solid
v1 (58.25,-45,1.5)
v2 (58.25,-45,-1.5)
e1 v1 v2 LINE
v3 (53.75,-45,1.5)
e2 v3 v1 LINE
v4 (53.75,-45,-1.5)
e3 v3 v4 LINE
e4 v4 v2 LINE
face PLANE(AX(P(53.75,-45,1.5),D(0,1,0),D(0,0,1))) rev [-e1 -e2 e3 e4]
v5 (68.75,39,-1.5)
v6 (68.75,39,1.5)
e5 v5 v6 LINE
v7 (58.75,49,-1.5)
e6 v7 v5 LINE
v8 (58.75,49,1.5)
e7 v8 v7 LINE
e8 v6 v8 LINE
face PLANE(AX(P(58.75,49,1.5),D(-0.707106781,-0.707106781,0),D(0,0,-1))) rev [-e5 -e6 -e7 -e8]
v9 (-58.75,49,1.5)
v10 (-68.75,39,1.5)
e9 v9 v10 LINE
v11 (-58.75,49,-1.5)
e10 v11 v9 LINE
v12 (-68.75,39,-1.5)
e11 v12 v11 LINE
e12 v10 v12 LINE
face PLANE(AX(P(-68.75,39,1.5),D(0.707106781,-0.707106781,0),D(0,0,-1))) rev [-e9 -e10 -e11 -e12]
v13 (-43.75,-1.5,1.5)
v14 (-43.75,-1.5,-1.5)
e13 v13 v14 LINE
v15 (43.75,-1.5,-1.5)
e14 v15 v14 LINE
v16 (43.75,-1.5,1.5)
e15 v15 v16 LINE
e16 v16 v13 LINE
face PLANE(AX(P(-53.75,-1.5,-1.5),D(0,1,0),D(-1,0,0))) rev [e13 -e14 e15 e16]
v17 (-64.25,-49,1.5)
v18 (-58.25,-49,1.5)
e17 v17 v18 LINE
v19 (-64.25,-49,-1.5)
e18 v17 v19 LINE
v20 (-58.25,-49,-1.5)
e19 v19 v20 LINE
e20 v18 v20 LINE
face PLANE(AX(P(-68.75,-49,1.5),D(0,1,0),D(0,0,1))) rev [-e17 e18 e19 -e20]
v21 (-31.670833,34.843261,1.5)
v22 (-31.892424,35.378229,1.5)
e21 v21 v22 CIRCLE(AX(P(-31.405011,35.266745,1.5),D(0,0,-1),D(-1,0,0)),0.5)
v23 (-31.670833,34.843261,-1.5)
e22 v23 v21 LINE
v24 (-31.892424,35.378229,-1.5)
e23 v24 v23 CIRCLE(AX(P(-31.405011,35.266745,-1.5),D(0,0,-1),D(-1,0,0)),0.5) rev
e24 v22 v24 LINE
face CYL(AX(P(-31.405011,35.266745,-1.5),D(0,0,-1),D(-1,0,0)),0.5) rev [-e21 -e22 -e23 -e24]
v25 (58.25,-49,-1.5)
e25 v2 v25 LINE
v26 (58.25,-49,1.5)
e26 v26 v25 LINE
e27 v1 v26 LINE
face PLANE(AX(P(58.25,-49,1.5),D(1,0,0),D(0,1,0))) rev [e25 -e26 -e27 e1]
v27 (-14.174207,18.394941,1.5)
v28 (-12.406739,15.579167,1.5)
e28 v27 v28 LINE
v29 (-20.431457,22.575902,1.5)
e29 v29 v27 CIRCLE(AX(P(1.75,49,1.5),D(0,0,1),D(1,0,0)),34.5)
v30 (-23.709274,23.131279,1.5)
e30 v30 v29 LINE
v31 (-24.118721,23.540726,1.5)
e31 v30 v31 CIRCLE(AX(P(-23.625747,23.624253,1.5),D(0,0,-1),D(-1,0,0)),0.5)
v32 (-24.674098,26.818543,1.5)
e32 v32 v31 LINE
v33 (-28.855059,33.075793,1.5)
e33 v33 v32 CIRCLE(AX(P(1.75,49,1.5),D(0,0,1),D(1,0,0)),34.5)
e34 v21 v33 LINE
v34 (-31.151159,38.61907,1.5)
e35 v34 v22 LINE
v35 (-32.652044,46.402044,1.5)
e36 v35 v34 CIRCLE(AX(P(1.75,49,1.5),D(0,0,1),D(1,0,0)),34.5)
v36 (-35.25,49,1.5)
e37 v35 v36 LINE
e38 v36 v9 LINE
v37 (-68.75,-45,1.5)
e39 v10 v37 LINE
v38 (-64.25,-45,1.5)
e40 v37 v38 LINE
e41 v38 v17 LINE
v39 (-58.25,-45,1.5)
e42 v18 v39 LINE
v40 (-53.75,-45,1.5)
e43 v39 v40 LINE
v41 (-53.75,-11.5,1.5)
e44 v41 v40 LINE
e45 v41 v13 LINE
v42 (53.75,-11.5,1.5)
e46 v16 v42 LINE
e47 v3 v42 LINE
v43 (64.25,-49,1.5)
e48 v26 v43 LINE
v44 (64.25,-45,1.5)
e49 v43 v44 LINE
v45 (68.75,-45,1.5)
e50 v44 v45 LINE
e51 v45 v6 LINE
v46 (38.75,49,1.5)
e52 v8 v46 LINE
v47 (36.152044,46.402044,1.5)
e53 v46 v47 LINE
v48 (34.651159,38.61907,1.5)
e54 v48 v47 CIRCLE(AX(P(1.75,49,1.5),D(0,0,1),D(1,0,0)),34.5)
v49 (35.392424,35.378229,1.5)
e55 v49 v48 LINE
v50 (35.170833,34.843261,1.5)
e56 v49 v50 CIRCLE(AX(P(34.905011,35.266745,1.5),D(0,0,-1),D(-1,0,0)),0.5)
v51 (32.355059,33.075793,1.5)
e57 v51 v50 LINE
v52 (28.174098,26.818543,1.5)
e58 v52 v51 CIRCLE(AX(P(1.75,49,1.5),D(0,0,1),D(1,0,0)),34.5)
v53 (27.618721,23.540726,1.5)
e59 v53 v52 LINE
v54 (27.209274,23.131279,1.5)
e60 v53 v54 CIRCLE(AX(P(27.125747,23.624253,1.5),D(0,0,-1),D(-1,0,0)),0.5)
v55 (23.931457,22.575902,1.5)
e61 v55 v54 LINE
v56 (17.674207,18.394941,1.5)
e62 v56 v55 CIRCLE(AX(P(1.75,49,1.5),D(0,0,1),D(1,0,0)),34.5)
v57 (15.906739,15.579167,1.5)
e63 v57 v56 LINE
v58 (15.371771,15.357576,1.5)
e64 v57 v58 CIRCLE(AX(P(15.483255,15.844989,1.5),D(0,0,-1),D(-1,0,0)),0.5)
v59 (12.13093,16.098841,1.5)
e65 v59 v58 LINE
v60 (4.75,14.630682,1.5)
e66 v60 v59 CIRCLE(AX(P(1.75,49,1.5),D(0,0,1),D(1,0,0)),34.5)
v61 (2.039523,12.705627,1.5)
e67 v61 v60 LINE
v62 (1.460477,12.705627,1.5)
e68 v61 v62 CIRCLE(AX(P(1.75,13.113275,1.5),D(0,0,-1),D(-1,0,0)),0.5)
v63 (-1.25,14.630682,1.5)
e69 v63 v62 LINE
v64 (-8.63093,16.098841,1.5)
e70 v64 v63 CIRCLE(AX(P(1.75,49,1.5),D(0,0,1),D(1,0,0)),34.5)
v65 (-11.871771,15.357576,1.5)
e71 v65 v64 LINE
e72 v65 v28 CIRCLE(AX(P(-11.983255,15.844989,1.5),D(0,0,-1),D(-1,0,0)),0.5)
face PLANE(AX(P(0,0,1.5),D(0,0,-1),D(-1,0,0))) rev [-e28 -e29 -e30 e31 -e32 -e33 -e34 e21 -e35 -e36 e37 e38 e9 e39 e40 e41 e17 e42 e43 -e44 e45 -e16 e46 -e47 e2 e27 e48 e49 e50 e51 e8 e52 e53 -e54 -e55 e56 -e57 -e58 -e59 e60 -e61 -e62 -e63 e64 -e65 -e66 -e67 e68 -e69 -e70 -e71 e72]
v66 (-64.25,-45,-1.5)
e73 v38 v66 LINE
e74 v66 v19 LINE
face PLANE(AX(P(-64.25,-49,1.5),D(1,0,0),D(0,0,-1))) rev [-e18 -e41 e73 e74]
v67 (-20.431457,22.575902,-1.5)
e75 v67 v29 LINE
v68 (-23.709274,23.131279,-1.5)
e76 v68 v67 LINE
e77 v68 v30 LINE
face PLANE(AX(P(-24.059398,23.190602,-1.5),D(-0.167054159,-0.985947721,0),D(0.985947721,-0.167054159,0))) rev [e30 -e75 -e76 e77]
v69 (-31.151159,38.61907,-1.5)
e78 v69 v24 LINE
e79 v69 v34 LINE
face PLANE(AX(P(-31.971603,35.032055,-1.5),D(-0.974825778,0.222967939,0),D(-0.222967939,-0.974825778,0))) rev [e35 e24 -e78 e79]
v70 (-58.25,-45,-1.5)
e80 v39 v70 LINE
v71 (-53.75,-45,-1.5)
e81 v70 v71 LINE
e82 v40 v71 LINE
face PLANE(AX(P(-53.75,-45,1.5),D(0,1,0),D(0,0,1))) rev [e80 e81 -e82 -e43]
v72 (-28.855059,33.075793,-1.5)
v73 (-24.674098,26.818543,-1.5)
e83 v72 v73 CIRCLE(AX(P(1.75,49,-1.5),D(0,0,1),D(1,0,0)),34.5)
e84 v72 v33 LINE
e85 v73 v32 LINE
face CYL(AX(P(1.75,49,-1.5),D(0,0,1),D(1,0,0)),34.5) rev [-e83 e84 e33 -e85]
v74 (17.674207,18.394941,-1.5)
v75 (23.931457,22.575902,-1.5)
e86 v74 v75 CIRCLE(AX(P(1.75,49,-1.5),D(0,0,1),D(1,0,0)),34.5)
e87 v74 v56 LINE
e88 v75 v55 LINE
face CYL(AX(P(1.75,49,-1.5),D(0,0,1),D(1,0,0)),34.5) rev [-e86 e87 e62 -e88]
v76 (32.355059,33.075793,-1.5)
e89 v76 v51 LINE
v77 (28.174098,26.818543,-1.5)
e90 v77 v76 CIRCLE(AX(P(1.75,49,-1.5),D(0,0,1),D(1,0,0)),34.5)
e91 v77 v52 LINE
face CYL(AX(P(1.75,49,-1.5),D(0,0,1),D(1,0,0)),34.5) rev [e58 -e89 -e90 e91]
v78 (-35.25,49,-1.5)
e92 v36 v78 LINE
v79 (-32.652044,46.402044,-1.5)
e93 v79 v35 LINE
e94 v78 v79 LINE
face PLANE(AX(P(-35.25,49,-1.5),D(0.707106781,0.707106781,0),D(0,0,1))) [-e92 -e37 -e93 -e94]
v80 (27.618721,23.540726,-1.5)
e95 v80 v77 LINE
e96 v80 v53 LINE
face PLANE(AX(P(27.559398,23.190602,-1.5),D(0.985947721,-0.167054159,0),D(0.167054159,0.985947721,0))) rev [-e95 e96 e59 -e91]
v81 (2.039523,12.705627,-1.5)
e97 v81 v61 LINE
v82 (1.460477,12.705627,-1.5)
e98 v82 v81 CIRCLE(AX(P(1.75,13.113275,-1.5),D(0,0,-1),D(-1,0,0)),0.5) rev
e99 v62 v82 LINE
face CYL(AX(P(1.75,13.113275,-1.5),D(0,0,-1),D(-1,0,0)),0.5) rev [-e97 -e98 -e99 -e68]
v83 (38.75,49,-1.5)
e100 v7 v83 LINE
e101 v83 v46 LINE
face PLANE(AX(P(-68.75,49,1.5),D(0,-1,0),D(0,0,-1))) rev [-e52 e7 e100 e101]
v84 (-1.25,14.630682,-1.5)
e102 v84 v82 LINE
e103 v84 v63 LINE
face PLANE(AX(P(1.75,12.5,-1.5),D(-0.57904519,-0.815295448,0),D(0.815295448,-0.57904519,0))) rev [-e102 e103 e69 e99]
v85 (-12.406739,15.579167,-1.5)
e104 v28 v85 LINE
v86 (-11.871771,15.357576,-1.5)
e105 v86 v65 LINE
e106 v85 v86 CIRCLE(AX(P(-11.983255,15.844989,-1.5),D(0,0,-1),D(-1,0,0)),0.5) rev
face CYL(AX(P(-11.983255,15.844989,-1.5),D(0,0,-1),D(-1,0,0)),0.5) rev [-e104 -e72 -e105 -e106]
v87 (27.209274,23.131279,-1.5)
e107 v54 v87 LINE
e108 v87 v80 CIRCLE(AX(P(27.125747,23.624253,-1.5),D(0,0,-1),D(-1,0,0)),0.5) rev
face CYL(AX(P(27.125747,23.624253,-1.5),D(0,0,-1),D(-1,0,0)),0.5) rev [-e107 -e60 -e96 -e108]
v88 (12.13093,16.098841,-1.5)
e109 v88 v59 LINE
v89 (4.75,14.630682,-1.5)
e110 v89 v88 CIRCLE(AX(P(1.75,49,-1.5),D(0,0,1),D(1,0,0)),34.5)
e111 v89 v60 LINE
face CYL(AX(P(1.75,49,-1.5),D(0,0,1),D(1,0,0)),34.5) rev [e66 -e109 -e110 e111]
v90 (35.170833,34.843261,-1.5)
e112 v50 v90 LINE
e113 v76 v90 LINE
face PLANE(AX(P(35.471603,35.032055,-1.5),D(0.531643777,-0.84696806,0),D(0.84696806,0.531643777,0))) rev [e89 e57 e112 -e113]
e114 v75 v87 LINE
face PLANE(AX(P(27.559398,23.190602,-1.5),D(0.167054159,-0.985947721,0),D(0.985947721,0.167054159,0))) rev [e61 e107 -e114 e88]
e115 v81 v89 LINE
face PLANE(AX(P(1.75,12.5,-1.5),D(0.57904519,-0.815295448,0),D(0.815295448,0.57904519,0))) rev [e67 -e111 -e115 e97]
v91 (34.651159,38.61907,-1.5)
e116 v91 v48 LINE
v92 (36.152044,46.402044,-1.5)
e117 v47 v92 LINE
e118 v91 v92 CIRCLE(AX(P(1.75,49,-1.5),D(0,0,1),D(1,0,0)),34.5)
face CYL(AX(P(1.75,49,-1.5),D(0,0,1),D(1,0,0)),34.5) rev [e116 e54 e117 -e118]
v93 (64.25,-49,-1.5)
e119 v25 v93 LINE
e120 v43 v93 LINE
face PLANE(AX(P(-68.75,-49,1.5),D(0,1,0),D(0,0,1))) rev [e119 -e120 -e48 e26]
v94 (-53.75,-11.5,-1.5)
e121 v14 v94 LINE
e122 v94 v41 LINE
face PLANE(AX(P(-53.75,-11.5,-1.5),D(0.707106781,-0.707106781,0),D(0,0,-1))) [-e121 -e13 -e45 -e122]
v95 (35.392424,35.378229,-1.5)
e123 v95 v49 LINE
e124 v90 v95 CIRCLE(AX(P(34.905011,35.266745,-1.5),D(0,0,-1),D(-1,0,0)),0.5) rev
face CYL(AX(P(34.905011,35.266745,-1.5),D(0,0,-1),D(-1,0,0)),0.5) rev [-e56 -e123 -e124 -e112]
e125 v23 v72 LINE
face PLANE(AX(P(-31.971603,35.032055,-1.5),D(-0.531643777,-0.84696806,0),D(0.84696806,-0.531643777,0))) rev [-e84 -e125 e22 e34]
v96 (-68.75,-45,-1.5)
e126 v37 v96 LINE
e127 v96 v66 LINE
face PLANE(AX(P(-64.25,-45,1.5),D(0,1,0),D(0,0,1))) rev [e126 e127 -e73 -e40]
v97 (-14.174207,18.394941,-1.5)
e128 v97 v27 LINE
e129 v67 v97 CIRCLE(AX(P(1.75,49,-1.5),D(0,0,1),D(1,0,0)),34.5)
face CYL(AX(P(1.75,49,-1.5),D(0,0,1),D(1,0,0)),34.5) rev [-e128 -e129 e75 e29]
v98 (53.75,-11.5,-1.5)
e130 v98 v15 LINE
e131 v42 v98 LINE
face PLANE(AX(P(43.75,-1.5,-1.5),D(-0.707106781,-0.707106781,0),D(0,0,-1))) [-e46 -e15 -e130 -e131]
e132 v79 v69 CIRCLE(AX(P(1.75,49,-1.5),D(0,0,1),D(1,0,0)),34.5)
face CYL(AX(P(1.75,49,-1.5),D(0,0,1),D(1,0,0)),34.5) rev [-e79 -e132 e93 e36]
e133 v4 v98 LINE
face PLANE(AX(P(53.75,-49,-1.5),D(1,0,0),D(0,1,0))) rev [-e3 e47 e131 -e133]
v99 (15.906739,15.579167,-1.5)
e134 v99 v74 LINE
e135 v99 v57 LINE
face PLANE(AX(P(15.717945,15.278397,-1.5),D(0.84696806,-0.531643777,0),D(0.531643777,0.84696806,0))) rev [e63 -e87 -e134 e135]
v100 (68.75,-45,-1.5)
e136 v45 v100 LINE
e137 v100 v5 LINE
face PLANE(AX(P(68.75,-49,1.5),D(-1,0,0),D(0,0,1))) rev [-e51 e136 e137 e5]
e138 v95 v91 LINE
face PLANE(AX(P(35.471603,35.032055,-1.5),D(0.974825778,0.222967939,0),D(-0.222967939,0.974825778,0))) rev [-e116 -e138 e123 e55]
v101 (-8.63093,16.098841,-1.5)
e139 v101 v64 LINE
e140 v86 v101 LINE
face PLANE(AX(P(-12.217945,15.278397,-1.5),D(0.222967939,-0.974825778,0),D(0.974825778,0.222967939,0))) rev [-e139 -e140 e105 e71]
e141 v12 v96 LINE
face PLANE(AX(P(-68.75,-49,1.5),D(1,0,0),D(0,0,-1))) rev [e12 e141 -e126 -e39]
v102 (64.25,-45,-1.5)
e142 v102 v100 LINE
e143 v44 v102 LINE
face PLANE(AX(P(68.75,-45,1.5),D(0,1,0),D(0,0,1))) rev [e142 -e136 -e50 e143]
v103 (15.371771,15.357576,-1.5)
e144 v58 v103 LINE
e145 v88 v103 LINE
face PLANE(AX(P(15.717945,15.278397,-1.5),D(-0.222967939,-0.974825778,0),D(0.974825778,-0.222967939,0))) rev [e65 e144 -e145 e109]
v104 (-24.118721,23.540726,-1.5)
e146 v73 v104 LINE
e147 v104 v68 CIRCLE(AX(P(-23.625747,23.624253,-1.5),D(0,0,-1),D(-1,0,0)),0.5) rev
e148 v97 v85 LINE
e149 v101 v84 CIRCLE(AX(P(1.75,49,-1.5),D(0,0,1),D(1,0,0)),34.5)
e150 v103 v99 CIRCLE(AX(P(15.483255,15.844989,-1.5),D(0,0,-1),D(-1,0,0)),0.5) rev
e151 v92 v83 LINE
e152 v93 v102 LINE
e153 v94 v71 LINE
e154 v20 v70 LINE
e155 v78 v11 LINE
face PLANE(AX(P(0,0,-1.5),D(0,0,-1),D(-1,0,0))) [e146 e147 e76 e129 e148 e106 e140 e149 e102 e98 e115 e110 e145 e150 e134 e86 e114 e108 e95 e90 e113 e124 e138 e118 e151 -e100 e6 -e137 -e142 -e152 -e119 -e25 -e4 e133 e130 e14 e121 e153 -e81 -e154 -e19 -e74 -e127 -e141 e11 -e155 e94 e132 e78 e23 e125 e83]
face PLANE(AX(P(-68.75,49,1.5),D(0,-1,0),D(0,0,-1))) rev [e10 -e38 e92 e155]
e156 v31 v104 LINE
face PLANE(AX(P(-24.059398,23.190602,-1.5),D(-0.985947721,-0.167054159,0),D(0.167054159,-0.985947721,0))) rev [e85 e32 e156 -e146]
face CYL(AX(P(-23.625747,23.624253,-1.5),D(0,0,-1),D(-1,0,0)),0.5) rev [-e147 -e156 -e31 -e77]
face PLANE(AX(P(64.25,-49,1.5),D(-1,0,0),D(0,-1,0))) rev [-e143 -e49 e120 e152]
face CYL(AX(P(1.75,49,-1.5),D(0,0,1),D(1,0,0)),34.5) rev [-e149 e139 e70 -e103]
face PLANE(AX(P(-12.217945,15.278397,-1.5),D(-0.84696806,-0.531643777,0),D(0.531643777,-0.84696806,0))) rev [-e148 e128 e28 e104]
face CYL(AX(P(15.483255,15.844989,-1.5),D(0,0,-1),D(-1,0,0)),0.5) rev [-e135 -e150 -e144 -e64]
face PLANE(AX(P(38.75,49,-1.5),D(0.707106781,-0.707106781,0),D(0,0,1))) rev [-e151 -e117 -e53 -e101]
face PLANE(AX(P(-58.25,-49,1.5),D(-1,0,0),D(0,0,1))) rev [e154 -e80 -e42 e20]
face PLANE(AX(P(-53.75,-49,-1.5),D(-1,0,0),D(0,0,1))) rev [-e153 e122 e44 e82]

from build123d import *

# Parameters (mm, degrees)
SKETCH1_W           = 137.5
SKETCH1_H           = 98
BOSS_EXTRUDE1_DEPTH = 1.5
SKETCH2_R           = 34
SKETCH2_W           = 107.5
SKETCH2_H           = 47.5
CUT_EXTRUDE1_DEPTH  = 85.478177656
CUT_EXTRUDE3_DEPTH  = 85.478177656
FILLET1_R           = 0.5
SKETCH22_W          = 4.5
SKETCH22_H          = 4
CUT_EXTRUDE5_DEPTH  = 85.478177656
CHAMFER1_SIZE       = 10
CHAMFER2_SIZE       = 2.5


with BuildPart() as part:
    # Sketch1 → Boss-Extrude1 (new, symmetric)
    with BuildSketch(Plane.XY):
        Rectangle(SKETCH1_W, SKETCH1_H)
    extrude(amount=BOSS_EXTRUDE1_DEPTH, both=True)

    # Sketch2 → Cut-Extrude1 (cut, through all)
    with BuildSketch(Plane.XY.offset(1.5)):
        with Locations((1.75, 49)):
            Circle(SKETCH2_R)
        with Locations((0, -25.25)):
            Rectangle(SKETCH2_W, SKETCH2_H)
    extrude(amount=-CUT_EXTRUDE1_DEPTH, mode=Mode.SUBTRACT)

    # Sketch17 → Cut-Extrude3 (cut, through all)
    with BuildSketch(Plane.XY.offset(1.5)):
        with BuildLine():
            Line((1.75, 12.5), (-1.25, 14.630682288))
            ThreePointArc((-1.25, 14.630682288), (-4.98061611, 15.162907826), (-8.630929873, 16.098840522))
            Line((-8.630929873, 16.098840522), (-12.217945281, 15.278397063))
            Line((-12.217945281, 15.278397063), (-14.174207068, 18.394941116))
            ThreePointArc((-14.174207068, 18.394941116), (-17.417173039, 20.314298376), (-20.431457275, 22.575902037))
            Line((-20.431457275, 22.575902037), (-24.059397513, 23.190602487))
            Line((-24.059397513, 23.190602487), (-24.674097963, 26.818542725))
            ThreePointArc((-24.674097963, 26.818542725), (-26.935701624, 29.832826961), (-28.855058884, 33.075792932))
            Line((-28.855058884, 33.075792932), (-31.971602937, 35.032054719))
            Line((-31.971602937, 35.032054719), (-31.151159478, 38.619070127))
            ThreePointArc((-31.151159478, 38.619070127), (1.75, 83.5), (34.651159478, 38.619070127))
            Line((34.651159478, 38.619070127), (35.471602937, 35.032054719))
            Line((35.471602937, 35.032054719), (32.355058884, 33.075792932))
            ThreePointArc((32.355058884, 33.075792932), (30.435701624, 29.832826961), (28.174097963, 26.818542725))
            Line((28.174097963, 26.818542725), (27.559397513, 23.190602487))
            Line((27.559397513, 23.190602487), (23.931457275, 22.575902037))
            ThreePointArc((23.931457275, 22.575902037), (20.917173039, 20.314298376), (17.674207068, 18.394941116))
            Line((17.674207068, 18.394941116), (15.717945281, 15.278397063))
            Line((15.717945281, 15.278397063), (12.130929873, 16.098840522))
            ThreePointArc((12.130929873, 16.098840522), (8.48061611, 15.162907826), (4.75, 14.630682288))
            Line((4.75, 14.630682288), (1.75, 12.5))
        make_face()
    extrude(amount=-CUT_EXTRUDE3_DEPTH, mode=Mode.SUBTRACT)

    # Fillet1
    fillet1_edges = [part.edges().sort_by_distance(p)[0] for p in [
        (15.717945281, 15.278397063, 0),
        (1.75, 12.5, 0),
        (-12.217945281, 15.278397063, 0),
        (-24.059397513, 23.190602487, 0),
        (-31.971602937, 35.032054719, 0),
        (35.471602937, 35.032054719, 0),
        (27.559397513, 23.190602487, 0),
    ]]
    fillet(fillet1_edges, radius=FILLET1_R)

    # Sketch22 → Cut-Extrude5 (cut, through all)
    with BuildSketch(Plane(origin=(0, 0, -1.5), x_dir=(-1, 0, 0), z_dir=(0, 0, -1))):
        with Locations((-66.5, -47)):
            Rectangle(SKETCH22_W, SKETCH22_H)
        with Locations((66.5, -47)):
            Rectangle(SKETCH22_W, SKETCH22_H)
        with Locations((56, -47)):
            Rectangle(SKETCH22_W, SKETCH22_H)
        with Locations((-56, -47)):
            Rectangle(SKETCH22_W, SKETCH22_H)
    extrude(amount=-CUT_EXTRUDE5_DEPTH, mode=Mode.SUBTRACT)

    # Chamfer1
    chamfer1_edges = [part.edges().sort_by_distance(p)[0] for p in [
        (-53.75, -1.5, 0),
        (53.75, -1.5, 0),
        (-68.75, 49, 0),
        (68.75, 49, 0),
    ]]
    chamfer(chamfer1_edges, length=CHAMFER1_SIZE)

    # Chamfer2
    # the kernel refuses this chamfer: 2.5 mm, written as the material it takes off along each edge
    with BuildSketch(Plane(origin=(36.25, 49, -8.184978913), x_dir=(1, 0, 0), z_dir=(0, 0, 1))) as chamfer2_piece_1:
        with BuildLine():
            Line((CHAMFER2_SIZE, 0), (-0.097956106, -2.597956106))
            ThreePointArc((-0.097956106, -2.597956106), (-0.025900977, -1.336598881), (0, 0))
            Line((0, 0), (CHAMFER2_SIZE, 0))
        make_face()
    extrude(amount=16.369957825, mode=Mode.SUBTRACT)
    with BuildSketch(Plane(origin=(-32.75, 49, -8.184978913), x_dir=(-1, 0, 0), z_dir=(0, 0, 1))) as chamfer2_piece_2:
        with BuildLine():
            Line((CHAMFER2_SIZE, 0), (-0.097956106, 2.597956106))
            ThreePointArc((-0.097956106, 2.597956106), (-0.025900977, 1.336598881), (0, 0))
            Line((0, 0), (CHAMFER2_SIZE, 0))
        make_face()
    extrude(amount=16.369957825, mode=Mode.SUBTRACT)


solid = part.part
